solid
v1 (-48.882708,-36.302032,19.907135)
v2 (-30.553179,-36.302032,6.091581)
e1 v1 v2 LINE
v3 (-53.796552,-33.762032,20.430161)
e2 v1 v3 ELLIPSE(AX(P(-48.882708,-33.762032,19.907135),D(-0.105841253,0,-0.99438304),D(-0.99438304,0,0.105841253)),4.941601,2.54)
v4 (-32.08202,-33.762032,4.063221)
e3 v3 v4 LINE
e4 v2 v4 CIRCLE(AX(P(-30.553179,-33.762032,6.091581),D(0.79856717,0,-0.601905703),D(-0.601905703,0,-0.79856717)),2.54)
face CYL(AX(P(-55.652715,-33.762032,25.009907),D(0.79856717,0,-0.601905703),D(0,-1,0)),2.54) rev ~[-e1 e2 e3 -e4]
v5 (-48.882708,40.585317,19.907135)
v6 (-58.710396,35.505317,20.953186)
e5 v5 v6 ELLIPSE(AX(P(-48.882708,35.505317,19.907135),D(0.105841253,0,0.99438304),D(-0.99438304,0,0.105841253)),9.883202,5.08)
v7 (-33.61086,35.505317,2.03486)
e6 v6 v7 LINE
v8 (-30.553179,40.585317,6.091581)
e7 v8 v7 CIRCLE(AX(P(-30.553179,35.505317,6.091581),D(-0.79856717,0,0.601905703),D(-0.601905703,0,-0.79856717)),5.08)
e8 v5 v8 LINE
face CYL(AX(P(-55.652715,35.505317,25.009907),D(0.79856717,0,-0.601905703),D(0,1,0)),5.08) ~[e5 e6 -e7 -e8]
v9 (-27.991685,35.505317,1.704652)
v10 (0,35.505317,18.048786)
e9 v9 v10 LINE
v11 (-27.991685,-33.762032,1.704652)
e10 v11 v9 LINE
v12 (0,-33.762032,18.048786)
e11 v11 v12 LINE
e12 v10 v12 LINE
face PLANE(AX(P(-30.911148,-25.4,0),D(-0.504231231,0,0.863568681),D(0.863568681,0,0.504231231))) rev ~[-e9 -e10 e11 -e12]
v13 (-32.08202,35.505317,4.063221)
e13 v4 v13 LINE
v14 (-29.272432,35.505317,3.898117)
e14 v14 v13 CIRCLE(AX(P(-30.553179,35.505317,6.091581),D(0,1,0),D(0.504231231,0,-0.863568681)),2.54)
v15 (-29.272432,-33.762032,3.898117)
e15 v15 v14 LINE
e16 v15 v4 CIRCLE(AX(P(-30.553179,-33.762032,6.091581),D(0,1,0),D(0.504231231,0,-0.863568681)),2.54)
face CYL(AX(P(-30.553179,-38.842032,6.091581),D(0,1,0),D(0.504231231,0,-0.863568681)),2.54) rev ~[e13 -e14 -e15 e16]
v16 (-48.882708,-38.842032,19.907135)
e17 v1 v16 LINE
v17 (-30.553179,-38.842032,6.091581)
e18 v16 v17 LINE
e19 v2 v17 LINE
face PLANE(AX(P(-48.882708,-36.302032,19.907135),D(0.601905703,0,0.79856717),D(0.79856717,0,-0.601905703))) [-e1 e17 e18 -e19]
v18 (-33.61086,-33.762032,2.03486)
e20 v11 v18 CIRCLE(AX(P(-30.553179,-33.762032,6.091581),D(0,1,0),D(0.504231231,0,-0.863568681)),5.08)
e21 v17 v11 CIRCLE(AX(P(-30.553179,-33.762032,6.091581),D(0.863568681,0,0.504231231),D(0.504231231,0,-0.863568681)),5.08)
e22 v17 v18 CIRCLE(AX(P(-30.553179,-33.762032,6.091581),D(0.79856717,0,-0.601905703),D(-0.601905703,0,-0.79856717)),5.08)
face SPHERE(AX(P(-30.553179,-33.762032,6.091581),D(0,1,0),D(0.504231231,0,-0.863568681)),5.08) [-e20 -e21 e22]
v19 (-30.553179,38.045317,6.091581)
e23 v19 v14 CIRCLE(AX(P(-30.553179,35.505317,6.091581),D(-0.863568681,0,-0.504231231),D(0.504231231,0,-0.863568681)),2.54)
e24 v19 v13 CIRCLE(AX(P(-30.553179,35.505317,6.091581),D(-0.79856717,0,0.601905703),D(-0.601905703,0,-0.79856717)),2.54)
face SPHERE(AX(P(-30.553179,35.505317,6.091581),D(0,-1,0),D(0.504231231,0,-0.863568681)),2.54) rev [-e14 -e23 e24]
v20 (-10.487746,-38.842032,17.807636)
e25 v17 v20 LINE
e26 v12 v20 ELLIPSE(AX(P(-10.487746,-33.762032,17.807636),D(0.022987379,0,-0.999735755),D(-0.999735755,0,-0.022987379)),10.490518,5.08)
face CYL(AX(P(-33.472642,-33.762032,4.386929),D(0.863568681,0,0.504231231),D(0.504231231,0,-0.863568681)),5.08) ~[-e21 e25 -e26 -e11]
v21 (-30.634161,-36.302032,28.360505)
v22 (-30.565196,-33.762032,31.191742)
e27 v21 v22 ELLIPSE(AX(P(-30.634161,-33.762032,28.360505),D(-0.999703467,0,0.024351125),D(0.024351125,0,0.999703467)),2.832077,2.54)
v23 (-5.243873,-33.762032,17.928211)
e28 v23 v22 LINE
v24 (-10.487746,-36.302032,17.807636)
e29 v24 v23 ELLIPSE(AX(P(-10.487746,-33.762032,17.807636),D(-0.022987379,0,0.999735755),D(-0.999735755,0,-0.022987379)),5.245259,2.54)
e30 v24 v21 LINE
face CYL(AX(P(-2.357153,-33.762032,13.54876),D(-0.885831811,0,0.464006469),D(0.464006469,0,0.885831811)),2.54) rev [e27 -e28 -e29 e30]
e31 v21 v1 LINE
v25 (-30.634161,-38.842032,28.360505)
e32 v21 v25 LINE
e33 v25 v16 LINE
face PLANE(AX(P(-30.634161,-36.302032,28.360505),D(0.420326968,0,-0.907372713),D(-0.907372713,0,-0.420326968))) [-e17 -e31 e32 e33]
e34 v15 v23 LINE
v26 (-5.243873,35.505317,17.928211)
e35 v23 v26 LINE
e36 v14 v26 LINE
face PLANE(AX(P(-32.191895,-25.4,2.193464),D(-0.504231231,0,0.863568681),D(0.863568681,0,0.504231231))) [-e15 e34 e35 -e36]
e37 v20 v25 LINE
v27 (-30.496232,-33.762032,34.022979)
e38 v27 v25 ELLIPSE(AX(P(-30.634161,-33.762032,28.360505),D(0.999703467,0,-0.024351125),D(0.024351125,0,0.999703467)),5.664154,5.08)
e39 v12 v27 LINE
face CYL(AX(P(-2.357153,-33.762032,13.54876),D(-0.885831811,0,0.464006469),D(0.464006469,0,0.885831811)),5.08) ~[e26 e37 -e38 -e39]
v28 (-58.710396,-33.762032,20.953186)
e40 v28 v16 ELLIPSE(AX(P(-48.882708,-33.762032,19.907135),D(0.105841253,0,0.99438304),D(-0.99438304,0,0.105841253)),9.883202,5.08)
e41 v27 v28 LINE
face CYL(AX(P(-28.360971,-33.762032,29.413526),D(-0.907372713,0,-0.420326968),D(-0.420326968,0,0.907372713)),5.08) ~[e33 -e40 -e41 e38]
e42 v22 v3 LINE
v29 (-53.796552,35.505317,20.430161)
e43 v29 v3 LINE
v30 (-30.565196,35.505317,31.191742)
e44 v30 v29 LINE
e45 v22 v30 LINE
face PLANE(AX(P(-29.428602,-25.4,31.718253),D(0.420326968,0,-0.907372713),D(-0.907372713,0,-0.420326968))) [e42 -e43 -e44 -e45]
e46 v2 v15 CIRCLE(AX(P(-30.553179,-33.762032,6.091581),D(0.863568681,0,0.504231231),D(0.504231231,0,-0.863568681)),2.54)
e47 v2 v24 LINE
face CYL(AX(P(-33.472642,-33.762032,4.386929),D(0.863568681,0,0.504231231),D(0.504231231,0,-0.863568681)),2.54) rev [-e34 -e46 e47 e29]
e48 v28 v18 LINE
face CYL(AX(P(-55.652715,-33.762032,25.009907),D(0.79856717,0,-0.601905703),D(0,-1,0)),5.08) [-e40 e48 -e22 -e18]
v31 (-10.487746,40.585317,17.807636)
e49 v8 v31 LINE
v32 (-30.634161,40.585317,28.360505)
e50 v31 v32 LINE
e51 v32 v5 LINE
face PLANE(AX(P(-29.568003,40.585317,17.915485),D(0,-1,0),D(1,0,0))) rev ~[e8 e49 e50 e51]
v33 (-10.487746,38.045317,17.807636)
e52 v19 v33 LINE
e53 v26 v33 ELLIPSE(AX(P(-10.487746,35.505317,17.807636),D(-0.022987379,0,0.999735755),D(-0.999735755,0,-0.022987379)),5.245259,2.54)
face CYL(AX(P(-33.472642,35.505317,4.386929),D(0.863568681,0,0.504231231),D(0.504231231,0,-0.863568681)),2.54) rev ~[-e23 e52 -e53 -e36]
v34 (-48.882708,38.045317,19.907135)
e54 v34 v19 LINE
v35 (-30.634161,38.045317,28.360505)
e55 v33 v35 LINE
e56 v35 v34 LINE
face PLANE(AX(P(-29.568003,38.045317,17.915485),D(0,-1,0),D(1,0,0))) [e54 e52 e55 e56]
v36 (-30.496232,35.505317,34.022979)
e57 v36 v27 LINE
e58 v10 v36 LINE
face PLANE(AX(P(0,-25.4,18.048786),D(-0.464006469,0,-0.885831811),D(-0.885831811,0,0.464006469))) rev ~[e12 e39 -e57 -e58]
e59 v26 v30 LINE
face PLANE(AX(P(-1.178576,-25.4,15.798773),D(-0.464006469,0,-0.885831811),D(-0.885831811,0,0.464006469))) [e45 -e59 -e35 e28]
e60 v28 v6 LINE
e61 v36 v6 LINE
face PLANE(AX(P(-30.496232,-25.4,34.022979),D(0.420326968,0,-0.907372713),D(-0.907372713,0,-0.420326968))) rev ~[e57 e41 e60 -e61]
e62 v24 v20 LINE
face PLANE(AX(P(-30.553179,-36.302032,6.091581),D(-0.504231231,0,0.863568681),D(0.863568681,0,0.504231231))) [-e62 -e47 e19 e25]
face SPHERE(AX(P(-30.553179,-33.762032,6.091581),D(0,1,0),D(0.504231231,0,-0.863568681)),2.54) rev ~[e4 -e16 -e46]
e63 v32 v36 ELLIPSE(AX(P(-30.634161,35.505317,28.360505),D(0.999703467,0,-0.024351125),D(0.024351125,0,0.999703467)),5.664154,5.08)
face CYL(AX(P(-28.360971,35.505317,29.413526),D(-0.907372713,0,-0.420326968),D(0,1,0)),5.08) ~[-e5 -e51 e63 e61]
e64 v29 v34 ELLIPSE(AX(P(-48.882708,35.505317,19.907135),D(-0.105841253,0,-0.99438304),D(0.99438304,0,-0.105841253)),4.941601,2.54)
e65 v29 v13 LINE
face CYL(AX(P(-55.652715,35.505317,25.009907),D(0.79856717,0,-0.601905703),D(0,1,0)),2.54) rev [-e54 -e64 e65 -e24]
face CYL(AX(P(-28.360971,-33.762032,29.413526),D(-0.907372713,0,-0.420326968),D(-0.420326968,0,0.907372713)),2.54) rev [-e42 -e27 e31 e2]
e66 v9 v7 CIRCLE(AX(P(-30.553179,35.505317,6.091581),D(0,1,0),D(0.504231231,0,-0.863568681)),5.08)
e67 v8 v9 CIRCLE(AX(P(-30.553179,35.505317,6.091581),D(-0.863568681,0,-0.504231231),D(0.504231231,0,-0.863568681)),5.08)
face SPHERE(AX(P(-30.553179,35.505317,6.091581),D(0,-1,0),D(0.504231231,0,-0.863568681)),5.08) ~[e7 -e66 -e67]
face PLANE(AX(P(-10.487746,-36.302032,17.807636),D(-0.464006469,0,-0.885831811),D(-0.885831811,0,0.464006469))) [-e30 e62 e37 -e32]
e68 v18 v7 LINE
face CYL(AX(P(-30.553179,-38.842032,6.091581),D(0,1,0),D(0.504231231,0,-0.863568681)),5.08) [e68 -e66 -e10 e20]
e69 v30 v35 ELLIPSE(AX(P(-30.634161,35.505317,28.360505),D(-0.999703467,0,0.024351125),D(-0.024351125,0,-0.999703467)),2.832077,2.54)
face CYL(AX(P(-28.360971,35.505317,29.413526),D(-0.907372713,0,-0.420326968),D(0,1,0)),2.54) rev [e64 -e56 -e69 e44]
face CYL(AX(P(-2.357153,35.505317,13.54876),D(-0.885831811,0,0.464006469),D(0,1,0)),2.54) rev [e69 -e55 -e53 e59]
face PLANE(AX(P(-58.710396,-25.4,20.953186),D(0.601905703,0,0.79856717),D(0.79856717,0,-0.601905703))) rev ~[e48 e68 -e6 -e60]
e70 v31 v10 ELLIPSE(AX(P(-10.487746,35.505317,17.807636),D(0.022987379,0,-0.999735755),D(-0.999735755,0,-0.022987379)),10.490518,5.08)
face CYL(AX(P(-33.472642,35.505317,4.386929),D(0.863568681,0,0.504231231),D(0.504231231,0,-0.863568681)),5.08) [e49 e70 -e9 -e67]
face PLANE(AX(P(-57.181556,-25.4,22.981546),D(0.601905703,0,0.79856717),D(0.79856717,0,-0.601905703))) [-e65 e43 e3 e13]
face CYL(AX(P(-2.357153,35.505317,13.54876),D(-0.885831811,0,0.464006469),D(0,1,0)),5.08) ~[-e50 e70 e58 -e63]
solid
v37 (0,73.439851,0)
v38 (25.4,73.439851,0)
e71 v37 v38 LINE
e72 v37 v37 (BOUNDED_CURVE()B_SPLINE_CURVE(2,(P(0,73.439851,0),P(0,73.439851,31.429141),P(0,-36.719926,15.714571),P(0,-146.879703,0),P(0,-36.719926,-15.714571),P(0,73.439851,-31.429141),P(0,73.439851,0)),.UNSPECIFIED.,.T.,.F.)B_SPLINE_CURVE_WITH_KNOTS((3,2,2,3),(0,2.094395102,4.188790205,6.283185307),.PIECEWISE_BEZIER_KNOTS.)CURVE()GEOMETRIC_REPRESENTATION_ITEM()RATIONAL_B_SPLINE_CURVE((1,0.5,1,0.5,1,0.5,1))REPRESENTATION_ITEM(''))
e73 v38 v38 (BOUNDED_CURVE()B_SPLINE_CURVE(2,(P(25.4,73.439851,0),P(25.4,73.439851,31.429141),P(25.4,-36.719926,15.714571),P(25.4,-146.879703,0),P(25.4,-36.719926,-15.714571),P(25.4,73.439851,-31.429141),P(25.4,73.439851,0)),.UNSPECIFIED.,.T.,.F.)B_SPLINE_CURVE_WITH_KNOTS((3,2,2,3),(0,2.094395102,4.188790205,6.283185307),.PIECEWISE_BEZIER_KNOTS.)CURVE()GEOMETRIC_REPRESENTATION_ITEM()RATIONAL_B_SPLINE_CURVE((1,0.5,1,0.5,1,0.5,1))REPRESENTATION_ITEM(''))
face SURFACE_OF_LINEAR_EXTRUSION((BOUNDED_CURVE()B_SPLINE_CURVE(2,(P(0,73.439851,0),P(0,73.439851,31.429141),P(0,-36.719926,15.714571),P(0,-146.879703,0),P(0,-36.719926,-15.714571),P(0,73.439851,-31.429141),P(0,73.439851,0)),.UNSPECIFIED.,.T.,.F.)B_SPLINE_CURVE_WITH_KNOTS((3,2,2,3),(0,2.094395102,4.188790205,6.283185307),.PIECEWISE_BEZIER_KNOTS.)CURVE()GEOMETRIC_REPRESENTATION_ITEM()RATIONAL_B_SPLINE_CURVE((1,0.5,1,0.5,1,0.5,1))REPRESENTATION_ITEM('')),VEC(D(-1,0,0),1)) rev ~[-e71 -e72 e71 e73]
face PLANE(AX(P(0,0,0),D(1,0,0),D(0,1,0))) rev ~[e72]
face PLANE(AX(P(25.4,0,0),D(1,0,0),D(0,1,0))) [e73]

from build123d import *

# Parameters (mm, degrees)
F1_DEPTH = 25.4
F3_DEPTH = 25.4
F4_DEPTH = 40.5853167176
F5_DEPTH = 13.4420320392
F6_R     = 5.08
F8_DEPTH = 18.0026832968
F9_T     = -2.54


# Not quite as in the source:
# - a shell that OpenCascade refuses in one call is made with other operations: the cavity is built on its own and cut out


with BuildPart() as f1:
    # F0 (on Right) → F1 (new body)
    with BuildSketch(Plane.YZ):
        with BuildLine():
            add(Edge.make_bspline(
                [(73.4398514032, 0), (73.4398514032, 31.4291412197), (-36.7199257016, 15.7145706098), (-146.8797028065, 0), (-36.7199257016, -15.7145706098), (73.4398514032, -31.4291412197), (73.4398514032, 0)],
                knots=[0, 0, 0, 2.0943951024, 2.0943951024, 4.1887902048, 4.1887902048, 6.2831853072, 6.2831853072, 6.2831853072], degree=2, weights=[1, 0.5, 1, 0.5, 1, 0.5, 1]))
        make_face()
    extrude(amount=F1_DEPTH)


with BuildPart() as f3:
    # F2 (on Front) → F3 (new body)
    with BuildSketch(Plane.XZ):
        Polygon((-30.9111475945, 0), (0, 18.0487856269), (-30.4962322116, 34.0229794383), (-58.7103962898, 20.9531858563), align=None)
    extrude(amount=F3_DEPTH)

    # F4 (add): a face of the model
    f4_faces = [f3.faces().sort_by_distance(p)[0] for p in [
        (-29.8150802382, 0, 17.8195988586),
    ]]
    extrude(f4_faces, amount=F4_DEPTH)

    # F5 (add): a face of the model
    f5_faces = [f3.faces().sort_by_distance(p)[0] for p in [
        (-29.8150802382, -25.4, 17.8195988586),
    ]]
    extrude(f5_faces, amount=F5_DEPTH)

    # F6
    f6_edges = [f3.edges().sort_by_distance(p)[0] for p in [
        (-15.248116, -38.842032, 26.035883),
        (-44.603314, -38.842032, 27.488083),
        (-30.911148, 0.871642, 0),
        (-15.455574, -38.842032, 9.024393),
        (-44.810772, -38.842032, 10.476593),
        (-15.248116, 40.585317, 26.035883),
        (-44.603314, 40.585317, 27.488083),
        (-15.455574, 40.585317, 9.024393),
        (-44.810772, 40.585317, 10.476593),
    ]]
    fillet(f6_edges, radius=F6_R)

    # F7 (on face) → F8 (join)
    with BuildSketch(Plane.XZ.offset(38.8420320392)):
        Polygon((-48.8827081385, 19.9071354088), (-39.7179437035, 12.9993583448), (-20.5204627354, 11.9496086934), (-10.4877462022, 17.807636106), (-30.6341607446, 28.3605046792), align=None)
        Polygon((-20.5204627354, 11.9496086934), (-39.7179437035, 12.9993583448), (-30.5531792686, 6.0915812808), align=None)
    extrude(amount=-F8_DEPTH)

    # F9: a shell. OpenCascade refuses it in one call, so the cavity is built on its own and cut out:
    # the body offset inwards by the wall thickness, plus a prism from it out through each open face.
    f9_core = offset(f3.part, amount=F9_T, mode=Mode.PRIVATE)
    f9_exits = [f9_core.faces().sort_by_distance(p)[0] for p in [
        (-29.986003, -36.302032, 17.753154),
    ]]
    add(f9_core, mode=Mode.SUBTRACT)
    extrude(f9_exits, amount=-F9_T, mode=Mode.SUBTRACT)


solid = Compound([f1.part, f3.part])
